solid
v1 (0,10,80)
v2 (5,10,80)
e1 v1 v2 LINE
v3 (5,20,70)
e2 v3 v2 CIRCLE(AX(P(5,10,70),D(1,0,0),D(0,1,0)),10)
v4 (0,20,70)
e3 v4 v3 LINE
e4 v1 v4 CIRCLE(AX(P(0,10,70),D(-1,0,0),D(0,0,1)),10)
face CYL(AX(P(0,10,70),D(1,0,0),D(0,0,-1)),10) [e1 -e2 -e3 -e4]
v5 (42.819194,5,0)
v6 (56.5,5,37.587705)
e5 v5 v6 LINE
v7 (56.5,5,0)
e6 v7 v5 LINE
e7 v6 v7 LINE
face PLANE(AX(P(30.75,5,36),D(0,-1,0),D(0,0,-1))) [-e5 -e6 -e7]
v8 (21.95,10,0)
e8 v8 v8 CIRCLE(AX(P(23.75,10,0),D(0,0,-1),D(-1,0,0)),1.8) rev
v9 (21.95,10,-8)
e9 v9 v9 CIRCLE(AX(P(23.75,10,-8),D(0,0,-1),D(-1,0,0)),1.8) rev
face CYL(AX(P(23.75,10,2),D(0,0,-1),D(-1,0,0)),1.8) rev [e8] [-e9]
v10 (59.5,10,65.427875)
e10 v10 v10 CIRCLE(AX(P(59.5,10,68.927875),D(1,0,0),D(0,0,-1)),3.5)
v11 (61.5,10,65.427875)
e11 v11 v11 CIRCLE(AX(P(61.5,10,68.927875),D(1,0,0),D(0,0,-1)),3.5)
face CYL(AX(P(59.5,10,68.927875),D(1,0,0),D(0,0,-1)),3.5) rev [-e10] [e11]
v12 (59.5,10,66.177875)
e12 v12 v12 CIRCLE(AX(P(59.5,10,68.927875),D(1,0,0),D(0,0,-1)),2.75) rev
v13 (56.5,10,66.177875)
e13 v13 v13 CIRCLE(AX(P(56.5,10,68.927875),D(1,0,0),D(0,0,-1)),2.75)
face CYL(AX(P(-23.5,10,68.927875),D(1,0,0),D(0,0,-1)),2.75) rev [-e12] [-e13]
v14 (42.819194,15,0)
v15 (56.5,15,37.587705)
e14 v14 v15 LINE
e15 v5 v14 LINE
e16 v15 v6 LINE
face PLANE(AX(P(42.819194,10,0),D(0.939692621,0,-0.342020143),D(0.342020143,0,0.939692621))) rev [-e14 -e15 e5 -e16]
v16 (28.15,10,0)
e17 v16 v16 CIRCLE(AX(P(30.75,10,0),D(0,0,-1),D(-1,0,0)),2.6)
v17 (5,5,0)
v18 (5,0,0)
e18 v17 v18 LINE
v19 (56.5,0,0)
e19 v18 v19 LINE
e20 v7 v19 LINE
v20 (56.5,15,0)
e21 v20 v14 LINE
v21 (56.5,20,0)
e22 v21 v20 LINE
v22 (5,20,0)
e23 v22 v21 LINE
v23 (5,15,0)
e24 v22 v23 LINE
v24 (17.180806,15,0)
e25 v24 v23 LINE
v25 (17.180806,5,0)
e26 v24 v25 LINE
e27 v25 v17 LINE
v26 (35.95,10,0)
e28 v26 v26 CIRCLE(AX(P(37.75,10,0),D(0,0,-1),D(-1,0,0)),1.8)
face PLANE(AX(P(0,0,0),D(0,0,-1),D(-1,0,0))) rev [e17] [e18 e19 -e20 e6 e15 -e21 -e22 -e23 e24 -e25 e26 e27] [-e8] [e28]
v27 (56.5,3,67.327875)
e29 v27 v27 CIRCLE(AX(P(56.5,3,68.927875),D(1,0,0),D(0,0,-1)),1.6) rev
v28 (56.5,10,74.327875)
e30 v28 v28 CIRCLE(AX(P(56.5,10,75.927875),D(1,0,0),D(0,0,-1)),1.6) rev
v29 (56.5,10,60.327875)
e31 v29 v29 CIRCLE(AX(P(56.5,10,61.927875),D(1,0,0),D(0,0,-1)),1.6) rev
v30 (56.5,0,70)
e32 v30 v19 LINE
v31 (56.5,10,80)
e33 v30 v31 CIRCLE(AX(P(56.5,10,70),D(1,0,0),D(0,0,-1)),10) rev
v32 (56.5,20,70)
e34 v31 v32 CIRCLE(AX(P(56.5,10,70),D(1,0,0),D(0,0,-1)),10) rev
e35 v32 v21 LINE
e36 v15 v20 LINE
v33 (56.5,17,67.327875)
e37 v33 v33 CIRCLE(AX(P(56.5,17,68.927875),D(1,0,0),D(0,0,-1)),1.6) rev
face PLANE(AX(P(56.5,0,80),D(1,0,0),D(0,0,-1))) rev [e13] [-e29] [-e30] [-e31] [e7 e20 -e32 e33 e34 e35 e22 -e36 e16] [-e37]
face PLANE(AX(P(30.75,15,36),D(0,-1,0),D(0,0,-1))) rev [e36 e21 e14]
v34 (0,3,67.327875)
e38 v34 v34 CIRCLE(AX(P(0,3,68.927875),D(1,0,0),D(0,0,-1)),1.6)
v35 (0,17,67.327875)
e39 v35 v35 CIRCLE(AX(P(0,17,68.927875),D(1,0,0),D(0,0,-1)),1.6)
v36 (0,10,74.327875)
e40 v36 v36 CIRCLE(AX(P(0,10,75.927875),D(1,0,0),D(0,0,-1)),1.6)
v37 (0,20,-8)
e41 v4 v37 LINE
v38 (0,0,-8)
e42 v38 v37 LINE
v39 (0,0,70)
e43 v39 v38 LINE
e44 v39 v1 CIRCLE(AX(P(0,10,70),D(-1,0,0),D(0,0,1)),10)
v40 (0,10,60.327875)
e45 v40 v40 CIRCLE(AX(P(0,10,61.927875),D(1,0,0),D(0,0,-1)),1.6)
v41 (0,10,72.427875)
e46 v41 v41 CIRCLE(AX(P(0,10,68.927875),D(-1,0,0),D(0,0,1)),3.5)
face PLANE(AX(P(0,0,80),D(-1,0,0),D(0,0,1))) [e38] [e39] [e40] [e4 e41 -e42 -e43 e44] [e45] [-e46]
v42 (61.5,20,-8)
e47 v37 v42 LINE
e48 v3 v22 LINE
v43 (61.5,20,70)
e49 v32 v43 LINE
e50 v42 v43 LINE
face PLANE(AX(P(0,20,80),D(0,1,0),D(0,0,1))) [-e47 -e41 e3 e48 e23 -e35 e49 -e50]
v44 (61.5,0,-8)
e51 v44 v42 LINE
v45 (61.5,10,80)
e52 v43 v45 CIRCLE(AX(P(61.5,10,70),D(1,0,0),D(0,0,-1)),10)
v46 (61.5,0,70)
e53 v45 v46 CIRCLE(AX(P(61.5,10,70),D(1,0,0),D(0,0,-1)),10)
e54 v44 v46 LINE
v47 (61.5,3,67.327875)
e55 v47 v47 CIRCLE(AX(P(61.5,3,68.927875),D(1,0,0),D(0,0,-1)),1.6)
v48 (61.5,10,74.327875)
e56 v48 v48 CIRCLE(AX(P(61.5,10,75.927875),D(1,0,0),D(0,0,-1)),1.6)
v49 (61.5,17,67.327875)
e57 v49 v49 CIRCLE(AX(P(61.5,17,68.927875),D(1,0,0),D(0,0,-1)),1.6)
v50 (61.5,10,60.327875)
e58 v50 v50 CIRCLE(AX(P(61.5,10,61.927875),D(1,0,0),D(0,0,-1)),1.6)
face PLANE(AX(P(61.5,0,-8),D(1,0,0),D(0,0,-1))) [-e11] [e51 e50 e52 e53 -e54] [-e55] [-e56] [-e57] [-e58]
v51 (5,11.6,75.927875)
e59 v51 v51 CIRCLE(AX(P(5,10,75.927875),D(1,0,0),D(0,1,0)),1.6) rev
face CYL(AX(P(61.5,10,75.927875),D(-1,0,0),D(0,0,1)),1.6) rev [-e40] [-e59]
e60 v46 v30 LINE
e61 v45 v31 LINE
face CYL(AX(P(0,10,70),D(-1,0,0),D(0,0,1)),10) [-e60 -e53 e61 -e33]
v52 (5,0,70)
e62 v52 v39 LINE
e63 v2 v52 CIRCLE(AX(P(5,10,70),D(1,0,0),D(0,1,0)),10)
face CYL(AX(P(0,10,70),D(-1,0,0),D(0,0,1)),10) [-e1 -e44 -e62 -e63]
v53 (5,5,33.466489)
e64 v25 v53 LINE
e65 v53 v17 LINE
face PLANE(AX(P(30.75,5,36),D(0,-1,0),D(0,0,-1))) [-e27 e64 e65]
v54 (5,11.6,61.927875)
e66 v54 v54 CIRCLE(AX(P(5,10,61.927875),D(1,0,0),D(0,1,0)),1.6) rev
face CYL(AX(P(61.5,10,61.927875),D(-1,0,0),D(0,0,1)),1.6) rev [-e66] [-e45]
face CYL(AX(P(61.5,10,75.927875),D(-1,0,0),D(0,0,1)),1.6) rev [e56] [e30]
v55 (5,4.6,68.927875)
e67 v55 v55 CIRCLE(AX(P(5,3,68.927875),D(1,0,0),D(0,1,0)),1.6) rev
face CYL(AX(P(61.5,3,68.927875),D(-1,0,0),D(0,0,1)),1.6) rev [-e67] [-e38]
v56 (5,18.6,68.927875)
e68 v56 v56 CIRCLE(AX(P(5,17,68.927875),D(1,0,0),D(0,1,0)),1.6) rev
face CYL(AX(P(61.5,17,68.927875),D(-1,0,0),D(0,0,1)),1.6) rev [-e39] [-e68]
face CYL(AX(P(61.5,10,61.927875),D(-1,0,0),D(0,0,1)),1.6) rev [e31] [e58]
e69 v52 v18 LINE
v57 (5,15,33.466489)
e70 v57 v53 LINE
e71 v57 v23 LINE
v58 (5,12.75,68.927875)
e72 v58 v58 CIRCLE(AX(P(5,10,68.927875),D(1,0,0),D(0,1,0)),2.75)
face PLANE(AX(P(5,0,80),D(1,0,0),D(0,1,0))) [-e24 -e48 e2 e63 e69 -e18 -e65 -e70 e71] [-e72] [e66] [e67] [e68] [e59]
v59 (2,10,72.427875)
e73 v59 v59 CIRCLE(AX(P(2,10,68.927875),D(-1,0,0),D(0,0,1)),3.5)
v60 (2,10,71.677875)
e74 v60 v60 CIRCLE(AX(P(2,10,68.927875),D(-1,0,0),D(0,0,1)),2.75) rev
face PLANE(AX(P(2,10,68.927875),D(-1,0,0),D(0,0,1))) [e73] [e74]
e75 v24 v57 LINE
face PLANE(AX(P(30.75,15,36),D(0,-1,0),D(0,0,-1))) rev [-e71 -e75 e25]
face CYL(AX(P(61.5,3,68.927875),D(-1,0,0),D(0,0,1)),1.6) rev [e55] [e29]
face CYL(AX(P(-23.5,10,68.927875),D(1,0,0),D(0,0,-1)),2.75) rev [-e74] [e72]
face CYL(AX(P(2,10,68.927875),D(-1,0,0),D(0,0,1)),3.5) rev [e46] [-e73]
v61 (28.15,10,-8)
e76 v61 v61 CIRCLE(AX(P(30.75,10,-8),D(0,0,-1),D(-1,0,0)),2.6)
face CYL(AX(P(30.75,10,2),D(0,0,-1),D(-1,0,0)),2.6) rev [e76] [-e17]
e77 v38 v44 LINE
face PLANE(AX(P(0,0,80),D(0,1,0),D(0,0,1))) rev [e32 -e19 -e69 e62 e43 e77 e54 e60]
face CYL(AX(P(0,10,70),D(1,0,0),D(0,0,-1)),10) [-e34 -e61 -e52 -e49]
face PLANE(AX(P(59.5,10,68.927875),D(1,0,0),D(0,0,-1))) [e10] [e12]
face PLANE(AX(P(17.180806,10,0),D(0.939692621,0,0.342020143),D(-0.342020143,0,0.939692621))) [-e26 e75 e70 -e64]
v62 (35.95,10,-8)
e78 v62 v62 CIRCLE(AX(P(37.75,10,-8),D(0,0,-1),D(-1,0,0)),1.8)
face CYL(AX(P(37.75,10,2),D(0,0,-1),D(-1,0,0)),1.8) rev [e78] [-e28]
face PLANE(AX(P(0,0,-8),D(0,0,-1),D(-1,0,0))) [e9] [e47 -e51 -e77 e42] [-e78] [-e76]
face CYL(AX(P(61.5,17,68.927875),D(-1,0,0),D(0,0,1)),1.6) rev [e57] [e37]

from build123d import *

# Parameters (mm, degrees)
ESQUISSE1_W                                 = 5
ESQUISSE1_H                                 = 20
BOSS_EXTRU_1_DEPTH                          = 80
BOSS_EXTRU_1_2_DEPTH                        = 80
ESQUISSE1_3_W                               = 61.5
ESQUISSE1_3_H                               = 20
BOSS_EXTRU_2_DEPTH                          = 8
ESQUISSE3_R                                 = 2.75
ENL_V_MAT_EXTRU_2_DEPTH                     = 85
ESQUISSE4_R                                 = 2.6
ESQUISSE4_R_2                               = 1.8
ENL_V_MAT_EXTRU_3_DEPTH                     = 10
CONG_4_R                                    = 10
ESQUISSE6_R                                 = 1.6
TROUS_PALONNIER_GRABCAD_M3_ENTRAXE_14_DEPTH = 103.870063673
NERVURE2_REACH                              = 103.401
ESQUISSE9_WALL_W                            = 40
ESQUISSE9_WALL_H                            = 10
ESQUISSE10_R                                = 3.5
ENL_V_MAT_EXTRU_4_DEPTH                     = 2
ENL_V_START                                 = -2
ESQUISSE11_R                                = 3.5
ENL_V_MAT_EXTRU_5_DEPTH                     = 2


with BuildPart() as part:
    # Esquisse1 → Boss.-Extru.1 (new body)
    with BuildSketch(Plane.XY):
        with Locations((2.5, 10)):
            Rectangle(ESQUISSE1_W, ESQUISSE1_H)
    extrude(amount=BOSS_EXTRU_1_DEPTH)



with BuildPart() as body_2:
    # Esquisse1 → Boss.-Extru.1 2 (new body)
    with BuildSketch(Plane.XY):
        with Locations((59, 10)):
            Rectangle(ESQUISSE1_W, ESQUISSE1_H)
    extrude(amount=BOSS_EXTRU_1_2_DEPTH)


with BuildPart() as part_1:
    add(part.part)

    add(body_2.part)  # Boss.-Extru.2 merges body 2
    # Esquisse1<3> → Boss.-Extru.2 (add)
    with BuildSketch(Plane.XY):
        with Locations((30.75, 10)):
            Rectangle(ESQUISSE1_3_W, ESQUISSE1_3_H)
    extrude(amount=-BOSS_EXTRU_2_DEPTH)

    # Esquisse3 → Enlèv. mat.-Extru.2 (cut)
    with BuildSketch(Plane(origin=(61.5, 0, 0), x_dir=(0, 0, -1), z_dir=(1, 0, 0))):
        with Locations((-68.927874881, 10)):
            Circle(ESQUISSE3_R)
    extrude(amount=-ENL_V_MAT_EXTRU_2_DEPTH, mode=Mode.SUBTRACT)

    # Esquisse4 → Enlèv. mat.-Extru.3 (cut)
    with BuildSketch(Plane(origin=(0, 0, -8), x_dir=(-1, 0, 0), z_dir=(0, 0, -1))):
        with Locations((-30.75, 10)):
            Circle(ESQUISSE4_R)
        with Locations((-37.75, 10)):
            Circle(ESQUISSE4_R_2)
        with Locations((-23.75, 10)):
            Circle(ESQUISSE4_R_2)
    extrude(amount=-ENL_V_MAT_EXTRU_3_DEPTH, mode=Mode.SUBTRACT)

    # Congé4
    cong_4_edges = [part_1.edges().sort_by_distance(p)[0] for p in [
        (2.5, 20, 80),
        (2.5, 0, 80),
        (59, 0, 80),
        (59, 20, 80),
    ]]
    fillet(cong_4_edges, radius=CONG_4_R - 0.0001)  # a hair under: the kernel refuses the full size

    # Esquisse6 → Trous palonnier GrabCAD M3 entraxe 14 (cut, through all)
    with BuildSketch(Plane(origin=(0, 0, 0), x_dir=(0, 0, -1), z_dir=(1, 0, 0))):
        with Locations((-75.927874881, 10)):
            Circle(ESQUISSE6_R)
        with Locations((-68.927874881, 17)):
            Circle(ESQUISSE6_R)
        with Locations((-61.927874881, 10)):
            Circle(ESQUISSE6_R)
        with Locations((-68.927874881, 3)):
            Circle(ESQUISSE6_R)
    extrude(amount=TROUS_PALONNIER_GRABCAD_M3_ENTRAXE_14_DEPTH, mode=Mode.SUBTRACT)

    # Esquisse9 wall → Nervure2 (add, up to next)
    with BuildSketch(Plane(origin=(49.659597134, 10, 18.793852416), x_dir=(0.342020143329, 0, 0.939692620785), z_dir=(-0.939692620785, 0, 0.342020143329)), mode=Mode.PRIVATE) as nervure2_sk1:
        Rectangle(ESQUISSE9_WALL_W, ESQUISSE9_WALL_H)
    nervure2_tool1 = extrude(nervure2_sk1.sketch, amount=-NERVURE2_REACH, mode=Mode.PRIVATE) - part_1.part
    nervure2 = nervure2_tool1.solids().sort_by_distance((49.659597134, 10, 18.793852416))[0]
    add(nervure2)

    # Symétrie1: Nervure2 across plane
    add(nervure2.mirror(Plane.ZY.offset(-30)))

    # Esquisse10 → Enlèv. mat.-Extru.4 (cut)
    with BuildSketch(Plane(origin=(61.5, 0, 0), x_dir=(0, 0, -1), z_dir=(1, 0, 0))):
        with Locations((-68.927874881, 10)):
            Circle(ESQUISSE10_R)
    extrude(amount=-ENL_V_MAT_EXTRU_4_DEPTH, mode=Mode.SUBTRACT)

    # Esquisse11 → Enlèv. mat.-Extru.5 (cut)
    with BuildSketch(Plane.ZY.offset(ENL_V_START)):
        with Locations(Location((68.927874881, 10, 0), (0, 0, 180))):
            Circle(ESQUISSE11_R)
    extrude(amount=ENL_V_MAT_EXTRU_5_DEPTH, mode=Mode.SUBTRACT)


solid = part_1.part
